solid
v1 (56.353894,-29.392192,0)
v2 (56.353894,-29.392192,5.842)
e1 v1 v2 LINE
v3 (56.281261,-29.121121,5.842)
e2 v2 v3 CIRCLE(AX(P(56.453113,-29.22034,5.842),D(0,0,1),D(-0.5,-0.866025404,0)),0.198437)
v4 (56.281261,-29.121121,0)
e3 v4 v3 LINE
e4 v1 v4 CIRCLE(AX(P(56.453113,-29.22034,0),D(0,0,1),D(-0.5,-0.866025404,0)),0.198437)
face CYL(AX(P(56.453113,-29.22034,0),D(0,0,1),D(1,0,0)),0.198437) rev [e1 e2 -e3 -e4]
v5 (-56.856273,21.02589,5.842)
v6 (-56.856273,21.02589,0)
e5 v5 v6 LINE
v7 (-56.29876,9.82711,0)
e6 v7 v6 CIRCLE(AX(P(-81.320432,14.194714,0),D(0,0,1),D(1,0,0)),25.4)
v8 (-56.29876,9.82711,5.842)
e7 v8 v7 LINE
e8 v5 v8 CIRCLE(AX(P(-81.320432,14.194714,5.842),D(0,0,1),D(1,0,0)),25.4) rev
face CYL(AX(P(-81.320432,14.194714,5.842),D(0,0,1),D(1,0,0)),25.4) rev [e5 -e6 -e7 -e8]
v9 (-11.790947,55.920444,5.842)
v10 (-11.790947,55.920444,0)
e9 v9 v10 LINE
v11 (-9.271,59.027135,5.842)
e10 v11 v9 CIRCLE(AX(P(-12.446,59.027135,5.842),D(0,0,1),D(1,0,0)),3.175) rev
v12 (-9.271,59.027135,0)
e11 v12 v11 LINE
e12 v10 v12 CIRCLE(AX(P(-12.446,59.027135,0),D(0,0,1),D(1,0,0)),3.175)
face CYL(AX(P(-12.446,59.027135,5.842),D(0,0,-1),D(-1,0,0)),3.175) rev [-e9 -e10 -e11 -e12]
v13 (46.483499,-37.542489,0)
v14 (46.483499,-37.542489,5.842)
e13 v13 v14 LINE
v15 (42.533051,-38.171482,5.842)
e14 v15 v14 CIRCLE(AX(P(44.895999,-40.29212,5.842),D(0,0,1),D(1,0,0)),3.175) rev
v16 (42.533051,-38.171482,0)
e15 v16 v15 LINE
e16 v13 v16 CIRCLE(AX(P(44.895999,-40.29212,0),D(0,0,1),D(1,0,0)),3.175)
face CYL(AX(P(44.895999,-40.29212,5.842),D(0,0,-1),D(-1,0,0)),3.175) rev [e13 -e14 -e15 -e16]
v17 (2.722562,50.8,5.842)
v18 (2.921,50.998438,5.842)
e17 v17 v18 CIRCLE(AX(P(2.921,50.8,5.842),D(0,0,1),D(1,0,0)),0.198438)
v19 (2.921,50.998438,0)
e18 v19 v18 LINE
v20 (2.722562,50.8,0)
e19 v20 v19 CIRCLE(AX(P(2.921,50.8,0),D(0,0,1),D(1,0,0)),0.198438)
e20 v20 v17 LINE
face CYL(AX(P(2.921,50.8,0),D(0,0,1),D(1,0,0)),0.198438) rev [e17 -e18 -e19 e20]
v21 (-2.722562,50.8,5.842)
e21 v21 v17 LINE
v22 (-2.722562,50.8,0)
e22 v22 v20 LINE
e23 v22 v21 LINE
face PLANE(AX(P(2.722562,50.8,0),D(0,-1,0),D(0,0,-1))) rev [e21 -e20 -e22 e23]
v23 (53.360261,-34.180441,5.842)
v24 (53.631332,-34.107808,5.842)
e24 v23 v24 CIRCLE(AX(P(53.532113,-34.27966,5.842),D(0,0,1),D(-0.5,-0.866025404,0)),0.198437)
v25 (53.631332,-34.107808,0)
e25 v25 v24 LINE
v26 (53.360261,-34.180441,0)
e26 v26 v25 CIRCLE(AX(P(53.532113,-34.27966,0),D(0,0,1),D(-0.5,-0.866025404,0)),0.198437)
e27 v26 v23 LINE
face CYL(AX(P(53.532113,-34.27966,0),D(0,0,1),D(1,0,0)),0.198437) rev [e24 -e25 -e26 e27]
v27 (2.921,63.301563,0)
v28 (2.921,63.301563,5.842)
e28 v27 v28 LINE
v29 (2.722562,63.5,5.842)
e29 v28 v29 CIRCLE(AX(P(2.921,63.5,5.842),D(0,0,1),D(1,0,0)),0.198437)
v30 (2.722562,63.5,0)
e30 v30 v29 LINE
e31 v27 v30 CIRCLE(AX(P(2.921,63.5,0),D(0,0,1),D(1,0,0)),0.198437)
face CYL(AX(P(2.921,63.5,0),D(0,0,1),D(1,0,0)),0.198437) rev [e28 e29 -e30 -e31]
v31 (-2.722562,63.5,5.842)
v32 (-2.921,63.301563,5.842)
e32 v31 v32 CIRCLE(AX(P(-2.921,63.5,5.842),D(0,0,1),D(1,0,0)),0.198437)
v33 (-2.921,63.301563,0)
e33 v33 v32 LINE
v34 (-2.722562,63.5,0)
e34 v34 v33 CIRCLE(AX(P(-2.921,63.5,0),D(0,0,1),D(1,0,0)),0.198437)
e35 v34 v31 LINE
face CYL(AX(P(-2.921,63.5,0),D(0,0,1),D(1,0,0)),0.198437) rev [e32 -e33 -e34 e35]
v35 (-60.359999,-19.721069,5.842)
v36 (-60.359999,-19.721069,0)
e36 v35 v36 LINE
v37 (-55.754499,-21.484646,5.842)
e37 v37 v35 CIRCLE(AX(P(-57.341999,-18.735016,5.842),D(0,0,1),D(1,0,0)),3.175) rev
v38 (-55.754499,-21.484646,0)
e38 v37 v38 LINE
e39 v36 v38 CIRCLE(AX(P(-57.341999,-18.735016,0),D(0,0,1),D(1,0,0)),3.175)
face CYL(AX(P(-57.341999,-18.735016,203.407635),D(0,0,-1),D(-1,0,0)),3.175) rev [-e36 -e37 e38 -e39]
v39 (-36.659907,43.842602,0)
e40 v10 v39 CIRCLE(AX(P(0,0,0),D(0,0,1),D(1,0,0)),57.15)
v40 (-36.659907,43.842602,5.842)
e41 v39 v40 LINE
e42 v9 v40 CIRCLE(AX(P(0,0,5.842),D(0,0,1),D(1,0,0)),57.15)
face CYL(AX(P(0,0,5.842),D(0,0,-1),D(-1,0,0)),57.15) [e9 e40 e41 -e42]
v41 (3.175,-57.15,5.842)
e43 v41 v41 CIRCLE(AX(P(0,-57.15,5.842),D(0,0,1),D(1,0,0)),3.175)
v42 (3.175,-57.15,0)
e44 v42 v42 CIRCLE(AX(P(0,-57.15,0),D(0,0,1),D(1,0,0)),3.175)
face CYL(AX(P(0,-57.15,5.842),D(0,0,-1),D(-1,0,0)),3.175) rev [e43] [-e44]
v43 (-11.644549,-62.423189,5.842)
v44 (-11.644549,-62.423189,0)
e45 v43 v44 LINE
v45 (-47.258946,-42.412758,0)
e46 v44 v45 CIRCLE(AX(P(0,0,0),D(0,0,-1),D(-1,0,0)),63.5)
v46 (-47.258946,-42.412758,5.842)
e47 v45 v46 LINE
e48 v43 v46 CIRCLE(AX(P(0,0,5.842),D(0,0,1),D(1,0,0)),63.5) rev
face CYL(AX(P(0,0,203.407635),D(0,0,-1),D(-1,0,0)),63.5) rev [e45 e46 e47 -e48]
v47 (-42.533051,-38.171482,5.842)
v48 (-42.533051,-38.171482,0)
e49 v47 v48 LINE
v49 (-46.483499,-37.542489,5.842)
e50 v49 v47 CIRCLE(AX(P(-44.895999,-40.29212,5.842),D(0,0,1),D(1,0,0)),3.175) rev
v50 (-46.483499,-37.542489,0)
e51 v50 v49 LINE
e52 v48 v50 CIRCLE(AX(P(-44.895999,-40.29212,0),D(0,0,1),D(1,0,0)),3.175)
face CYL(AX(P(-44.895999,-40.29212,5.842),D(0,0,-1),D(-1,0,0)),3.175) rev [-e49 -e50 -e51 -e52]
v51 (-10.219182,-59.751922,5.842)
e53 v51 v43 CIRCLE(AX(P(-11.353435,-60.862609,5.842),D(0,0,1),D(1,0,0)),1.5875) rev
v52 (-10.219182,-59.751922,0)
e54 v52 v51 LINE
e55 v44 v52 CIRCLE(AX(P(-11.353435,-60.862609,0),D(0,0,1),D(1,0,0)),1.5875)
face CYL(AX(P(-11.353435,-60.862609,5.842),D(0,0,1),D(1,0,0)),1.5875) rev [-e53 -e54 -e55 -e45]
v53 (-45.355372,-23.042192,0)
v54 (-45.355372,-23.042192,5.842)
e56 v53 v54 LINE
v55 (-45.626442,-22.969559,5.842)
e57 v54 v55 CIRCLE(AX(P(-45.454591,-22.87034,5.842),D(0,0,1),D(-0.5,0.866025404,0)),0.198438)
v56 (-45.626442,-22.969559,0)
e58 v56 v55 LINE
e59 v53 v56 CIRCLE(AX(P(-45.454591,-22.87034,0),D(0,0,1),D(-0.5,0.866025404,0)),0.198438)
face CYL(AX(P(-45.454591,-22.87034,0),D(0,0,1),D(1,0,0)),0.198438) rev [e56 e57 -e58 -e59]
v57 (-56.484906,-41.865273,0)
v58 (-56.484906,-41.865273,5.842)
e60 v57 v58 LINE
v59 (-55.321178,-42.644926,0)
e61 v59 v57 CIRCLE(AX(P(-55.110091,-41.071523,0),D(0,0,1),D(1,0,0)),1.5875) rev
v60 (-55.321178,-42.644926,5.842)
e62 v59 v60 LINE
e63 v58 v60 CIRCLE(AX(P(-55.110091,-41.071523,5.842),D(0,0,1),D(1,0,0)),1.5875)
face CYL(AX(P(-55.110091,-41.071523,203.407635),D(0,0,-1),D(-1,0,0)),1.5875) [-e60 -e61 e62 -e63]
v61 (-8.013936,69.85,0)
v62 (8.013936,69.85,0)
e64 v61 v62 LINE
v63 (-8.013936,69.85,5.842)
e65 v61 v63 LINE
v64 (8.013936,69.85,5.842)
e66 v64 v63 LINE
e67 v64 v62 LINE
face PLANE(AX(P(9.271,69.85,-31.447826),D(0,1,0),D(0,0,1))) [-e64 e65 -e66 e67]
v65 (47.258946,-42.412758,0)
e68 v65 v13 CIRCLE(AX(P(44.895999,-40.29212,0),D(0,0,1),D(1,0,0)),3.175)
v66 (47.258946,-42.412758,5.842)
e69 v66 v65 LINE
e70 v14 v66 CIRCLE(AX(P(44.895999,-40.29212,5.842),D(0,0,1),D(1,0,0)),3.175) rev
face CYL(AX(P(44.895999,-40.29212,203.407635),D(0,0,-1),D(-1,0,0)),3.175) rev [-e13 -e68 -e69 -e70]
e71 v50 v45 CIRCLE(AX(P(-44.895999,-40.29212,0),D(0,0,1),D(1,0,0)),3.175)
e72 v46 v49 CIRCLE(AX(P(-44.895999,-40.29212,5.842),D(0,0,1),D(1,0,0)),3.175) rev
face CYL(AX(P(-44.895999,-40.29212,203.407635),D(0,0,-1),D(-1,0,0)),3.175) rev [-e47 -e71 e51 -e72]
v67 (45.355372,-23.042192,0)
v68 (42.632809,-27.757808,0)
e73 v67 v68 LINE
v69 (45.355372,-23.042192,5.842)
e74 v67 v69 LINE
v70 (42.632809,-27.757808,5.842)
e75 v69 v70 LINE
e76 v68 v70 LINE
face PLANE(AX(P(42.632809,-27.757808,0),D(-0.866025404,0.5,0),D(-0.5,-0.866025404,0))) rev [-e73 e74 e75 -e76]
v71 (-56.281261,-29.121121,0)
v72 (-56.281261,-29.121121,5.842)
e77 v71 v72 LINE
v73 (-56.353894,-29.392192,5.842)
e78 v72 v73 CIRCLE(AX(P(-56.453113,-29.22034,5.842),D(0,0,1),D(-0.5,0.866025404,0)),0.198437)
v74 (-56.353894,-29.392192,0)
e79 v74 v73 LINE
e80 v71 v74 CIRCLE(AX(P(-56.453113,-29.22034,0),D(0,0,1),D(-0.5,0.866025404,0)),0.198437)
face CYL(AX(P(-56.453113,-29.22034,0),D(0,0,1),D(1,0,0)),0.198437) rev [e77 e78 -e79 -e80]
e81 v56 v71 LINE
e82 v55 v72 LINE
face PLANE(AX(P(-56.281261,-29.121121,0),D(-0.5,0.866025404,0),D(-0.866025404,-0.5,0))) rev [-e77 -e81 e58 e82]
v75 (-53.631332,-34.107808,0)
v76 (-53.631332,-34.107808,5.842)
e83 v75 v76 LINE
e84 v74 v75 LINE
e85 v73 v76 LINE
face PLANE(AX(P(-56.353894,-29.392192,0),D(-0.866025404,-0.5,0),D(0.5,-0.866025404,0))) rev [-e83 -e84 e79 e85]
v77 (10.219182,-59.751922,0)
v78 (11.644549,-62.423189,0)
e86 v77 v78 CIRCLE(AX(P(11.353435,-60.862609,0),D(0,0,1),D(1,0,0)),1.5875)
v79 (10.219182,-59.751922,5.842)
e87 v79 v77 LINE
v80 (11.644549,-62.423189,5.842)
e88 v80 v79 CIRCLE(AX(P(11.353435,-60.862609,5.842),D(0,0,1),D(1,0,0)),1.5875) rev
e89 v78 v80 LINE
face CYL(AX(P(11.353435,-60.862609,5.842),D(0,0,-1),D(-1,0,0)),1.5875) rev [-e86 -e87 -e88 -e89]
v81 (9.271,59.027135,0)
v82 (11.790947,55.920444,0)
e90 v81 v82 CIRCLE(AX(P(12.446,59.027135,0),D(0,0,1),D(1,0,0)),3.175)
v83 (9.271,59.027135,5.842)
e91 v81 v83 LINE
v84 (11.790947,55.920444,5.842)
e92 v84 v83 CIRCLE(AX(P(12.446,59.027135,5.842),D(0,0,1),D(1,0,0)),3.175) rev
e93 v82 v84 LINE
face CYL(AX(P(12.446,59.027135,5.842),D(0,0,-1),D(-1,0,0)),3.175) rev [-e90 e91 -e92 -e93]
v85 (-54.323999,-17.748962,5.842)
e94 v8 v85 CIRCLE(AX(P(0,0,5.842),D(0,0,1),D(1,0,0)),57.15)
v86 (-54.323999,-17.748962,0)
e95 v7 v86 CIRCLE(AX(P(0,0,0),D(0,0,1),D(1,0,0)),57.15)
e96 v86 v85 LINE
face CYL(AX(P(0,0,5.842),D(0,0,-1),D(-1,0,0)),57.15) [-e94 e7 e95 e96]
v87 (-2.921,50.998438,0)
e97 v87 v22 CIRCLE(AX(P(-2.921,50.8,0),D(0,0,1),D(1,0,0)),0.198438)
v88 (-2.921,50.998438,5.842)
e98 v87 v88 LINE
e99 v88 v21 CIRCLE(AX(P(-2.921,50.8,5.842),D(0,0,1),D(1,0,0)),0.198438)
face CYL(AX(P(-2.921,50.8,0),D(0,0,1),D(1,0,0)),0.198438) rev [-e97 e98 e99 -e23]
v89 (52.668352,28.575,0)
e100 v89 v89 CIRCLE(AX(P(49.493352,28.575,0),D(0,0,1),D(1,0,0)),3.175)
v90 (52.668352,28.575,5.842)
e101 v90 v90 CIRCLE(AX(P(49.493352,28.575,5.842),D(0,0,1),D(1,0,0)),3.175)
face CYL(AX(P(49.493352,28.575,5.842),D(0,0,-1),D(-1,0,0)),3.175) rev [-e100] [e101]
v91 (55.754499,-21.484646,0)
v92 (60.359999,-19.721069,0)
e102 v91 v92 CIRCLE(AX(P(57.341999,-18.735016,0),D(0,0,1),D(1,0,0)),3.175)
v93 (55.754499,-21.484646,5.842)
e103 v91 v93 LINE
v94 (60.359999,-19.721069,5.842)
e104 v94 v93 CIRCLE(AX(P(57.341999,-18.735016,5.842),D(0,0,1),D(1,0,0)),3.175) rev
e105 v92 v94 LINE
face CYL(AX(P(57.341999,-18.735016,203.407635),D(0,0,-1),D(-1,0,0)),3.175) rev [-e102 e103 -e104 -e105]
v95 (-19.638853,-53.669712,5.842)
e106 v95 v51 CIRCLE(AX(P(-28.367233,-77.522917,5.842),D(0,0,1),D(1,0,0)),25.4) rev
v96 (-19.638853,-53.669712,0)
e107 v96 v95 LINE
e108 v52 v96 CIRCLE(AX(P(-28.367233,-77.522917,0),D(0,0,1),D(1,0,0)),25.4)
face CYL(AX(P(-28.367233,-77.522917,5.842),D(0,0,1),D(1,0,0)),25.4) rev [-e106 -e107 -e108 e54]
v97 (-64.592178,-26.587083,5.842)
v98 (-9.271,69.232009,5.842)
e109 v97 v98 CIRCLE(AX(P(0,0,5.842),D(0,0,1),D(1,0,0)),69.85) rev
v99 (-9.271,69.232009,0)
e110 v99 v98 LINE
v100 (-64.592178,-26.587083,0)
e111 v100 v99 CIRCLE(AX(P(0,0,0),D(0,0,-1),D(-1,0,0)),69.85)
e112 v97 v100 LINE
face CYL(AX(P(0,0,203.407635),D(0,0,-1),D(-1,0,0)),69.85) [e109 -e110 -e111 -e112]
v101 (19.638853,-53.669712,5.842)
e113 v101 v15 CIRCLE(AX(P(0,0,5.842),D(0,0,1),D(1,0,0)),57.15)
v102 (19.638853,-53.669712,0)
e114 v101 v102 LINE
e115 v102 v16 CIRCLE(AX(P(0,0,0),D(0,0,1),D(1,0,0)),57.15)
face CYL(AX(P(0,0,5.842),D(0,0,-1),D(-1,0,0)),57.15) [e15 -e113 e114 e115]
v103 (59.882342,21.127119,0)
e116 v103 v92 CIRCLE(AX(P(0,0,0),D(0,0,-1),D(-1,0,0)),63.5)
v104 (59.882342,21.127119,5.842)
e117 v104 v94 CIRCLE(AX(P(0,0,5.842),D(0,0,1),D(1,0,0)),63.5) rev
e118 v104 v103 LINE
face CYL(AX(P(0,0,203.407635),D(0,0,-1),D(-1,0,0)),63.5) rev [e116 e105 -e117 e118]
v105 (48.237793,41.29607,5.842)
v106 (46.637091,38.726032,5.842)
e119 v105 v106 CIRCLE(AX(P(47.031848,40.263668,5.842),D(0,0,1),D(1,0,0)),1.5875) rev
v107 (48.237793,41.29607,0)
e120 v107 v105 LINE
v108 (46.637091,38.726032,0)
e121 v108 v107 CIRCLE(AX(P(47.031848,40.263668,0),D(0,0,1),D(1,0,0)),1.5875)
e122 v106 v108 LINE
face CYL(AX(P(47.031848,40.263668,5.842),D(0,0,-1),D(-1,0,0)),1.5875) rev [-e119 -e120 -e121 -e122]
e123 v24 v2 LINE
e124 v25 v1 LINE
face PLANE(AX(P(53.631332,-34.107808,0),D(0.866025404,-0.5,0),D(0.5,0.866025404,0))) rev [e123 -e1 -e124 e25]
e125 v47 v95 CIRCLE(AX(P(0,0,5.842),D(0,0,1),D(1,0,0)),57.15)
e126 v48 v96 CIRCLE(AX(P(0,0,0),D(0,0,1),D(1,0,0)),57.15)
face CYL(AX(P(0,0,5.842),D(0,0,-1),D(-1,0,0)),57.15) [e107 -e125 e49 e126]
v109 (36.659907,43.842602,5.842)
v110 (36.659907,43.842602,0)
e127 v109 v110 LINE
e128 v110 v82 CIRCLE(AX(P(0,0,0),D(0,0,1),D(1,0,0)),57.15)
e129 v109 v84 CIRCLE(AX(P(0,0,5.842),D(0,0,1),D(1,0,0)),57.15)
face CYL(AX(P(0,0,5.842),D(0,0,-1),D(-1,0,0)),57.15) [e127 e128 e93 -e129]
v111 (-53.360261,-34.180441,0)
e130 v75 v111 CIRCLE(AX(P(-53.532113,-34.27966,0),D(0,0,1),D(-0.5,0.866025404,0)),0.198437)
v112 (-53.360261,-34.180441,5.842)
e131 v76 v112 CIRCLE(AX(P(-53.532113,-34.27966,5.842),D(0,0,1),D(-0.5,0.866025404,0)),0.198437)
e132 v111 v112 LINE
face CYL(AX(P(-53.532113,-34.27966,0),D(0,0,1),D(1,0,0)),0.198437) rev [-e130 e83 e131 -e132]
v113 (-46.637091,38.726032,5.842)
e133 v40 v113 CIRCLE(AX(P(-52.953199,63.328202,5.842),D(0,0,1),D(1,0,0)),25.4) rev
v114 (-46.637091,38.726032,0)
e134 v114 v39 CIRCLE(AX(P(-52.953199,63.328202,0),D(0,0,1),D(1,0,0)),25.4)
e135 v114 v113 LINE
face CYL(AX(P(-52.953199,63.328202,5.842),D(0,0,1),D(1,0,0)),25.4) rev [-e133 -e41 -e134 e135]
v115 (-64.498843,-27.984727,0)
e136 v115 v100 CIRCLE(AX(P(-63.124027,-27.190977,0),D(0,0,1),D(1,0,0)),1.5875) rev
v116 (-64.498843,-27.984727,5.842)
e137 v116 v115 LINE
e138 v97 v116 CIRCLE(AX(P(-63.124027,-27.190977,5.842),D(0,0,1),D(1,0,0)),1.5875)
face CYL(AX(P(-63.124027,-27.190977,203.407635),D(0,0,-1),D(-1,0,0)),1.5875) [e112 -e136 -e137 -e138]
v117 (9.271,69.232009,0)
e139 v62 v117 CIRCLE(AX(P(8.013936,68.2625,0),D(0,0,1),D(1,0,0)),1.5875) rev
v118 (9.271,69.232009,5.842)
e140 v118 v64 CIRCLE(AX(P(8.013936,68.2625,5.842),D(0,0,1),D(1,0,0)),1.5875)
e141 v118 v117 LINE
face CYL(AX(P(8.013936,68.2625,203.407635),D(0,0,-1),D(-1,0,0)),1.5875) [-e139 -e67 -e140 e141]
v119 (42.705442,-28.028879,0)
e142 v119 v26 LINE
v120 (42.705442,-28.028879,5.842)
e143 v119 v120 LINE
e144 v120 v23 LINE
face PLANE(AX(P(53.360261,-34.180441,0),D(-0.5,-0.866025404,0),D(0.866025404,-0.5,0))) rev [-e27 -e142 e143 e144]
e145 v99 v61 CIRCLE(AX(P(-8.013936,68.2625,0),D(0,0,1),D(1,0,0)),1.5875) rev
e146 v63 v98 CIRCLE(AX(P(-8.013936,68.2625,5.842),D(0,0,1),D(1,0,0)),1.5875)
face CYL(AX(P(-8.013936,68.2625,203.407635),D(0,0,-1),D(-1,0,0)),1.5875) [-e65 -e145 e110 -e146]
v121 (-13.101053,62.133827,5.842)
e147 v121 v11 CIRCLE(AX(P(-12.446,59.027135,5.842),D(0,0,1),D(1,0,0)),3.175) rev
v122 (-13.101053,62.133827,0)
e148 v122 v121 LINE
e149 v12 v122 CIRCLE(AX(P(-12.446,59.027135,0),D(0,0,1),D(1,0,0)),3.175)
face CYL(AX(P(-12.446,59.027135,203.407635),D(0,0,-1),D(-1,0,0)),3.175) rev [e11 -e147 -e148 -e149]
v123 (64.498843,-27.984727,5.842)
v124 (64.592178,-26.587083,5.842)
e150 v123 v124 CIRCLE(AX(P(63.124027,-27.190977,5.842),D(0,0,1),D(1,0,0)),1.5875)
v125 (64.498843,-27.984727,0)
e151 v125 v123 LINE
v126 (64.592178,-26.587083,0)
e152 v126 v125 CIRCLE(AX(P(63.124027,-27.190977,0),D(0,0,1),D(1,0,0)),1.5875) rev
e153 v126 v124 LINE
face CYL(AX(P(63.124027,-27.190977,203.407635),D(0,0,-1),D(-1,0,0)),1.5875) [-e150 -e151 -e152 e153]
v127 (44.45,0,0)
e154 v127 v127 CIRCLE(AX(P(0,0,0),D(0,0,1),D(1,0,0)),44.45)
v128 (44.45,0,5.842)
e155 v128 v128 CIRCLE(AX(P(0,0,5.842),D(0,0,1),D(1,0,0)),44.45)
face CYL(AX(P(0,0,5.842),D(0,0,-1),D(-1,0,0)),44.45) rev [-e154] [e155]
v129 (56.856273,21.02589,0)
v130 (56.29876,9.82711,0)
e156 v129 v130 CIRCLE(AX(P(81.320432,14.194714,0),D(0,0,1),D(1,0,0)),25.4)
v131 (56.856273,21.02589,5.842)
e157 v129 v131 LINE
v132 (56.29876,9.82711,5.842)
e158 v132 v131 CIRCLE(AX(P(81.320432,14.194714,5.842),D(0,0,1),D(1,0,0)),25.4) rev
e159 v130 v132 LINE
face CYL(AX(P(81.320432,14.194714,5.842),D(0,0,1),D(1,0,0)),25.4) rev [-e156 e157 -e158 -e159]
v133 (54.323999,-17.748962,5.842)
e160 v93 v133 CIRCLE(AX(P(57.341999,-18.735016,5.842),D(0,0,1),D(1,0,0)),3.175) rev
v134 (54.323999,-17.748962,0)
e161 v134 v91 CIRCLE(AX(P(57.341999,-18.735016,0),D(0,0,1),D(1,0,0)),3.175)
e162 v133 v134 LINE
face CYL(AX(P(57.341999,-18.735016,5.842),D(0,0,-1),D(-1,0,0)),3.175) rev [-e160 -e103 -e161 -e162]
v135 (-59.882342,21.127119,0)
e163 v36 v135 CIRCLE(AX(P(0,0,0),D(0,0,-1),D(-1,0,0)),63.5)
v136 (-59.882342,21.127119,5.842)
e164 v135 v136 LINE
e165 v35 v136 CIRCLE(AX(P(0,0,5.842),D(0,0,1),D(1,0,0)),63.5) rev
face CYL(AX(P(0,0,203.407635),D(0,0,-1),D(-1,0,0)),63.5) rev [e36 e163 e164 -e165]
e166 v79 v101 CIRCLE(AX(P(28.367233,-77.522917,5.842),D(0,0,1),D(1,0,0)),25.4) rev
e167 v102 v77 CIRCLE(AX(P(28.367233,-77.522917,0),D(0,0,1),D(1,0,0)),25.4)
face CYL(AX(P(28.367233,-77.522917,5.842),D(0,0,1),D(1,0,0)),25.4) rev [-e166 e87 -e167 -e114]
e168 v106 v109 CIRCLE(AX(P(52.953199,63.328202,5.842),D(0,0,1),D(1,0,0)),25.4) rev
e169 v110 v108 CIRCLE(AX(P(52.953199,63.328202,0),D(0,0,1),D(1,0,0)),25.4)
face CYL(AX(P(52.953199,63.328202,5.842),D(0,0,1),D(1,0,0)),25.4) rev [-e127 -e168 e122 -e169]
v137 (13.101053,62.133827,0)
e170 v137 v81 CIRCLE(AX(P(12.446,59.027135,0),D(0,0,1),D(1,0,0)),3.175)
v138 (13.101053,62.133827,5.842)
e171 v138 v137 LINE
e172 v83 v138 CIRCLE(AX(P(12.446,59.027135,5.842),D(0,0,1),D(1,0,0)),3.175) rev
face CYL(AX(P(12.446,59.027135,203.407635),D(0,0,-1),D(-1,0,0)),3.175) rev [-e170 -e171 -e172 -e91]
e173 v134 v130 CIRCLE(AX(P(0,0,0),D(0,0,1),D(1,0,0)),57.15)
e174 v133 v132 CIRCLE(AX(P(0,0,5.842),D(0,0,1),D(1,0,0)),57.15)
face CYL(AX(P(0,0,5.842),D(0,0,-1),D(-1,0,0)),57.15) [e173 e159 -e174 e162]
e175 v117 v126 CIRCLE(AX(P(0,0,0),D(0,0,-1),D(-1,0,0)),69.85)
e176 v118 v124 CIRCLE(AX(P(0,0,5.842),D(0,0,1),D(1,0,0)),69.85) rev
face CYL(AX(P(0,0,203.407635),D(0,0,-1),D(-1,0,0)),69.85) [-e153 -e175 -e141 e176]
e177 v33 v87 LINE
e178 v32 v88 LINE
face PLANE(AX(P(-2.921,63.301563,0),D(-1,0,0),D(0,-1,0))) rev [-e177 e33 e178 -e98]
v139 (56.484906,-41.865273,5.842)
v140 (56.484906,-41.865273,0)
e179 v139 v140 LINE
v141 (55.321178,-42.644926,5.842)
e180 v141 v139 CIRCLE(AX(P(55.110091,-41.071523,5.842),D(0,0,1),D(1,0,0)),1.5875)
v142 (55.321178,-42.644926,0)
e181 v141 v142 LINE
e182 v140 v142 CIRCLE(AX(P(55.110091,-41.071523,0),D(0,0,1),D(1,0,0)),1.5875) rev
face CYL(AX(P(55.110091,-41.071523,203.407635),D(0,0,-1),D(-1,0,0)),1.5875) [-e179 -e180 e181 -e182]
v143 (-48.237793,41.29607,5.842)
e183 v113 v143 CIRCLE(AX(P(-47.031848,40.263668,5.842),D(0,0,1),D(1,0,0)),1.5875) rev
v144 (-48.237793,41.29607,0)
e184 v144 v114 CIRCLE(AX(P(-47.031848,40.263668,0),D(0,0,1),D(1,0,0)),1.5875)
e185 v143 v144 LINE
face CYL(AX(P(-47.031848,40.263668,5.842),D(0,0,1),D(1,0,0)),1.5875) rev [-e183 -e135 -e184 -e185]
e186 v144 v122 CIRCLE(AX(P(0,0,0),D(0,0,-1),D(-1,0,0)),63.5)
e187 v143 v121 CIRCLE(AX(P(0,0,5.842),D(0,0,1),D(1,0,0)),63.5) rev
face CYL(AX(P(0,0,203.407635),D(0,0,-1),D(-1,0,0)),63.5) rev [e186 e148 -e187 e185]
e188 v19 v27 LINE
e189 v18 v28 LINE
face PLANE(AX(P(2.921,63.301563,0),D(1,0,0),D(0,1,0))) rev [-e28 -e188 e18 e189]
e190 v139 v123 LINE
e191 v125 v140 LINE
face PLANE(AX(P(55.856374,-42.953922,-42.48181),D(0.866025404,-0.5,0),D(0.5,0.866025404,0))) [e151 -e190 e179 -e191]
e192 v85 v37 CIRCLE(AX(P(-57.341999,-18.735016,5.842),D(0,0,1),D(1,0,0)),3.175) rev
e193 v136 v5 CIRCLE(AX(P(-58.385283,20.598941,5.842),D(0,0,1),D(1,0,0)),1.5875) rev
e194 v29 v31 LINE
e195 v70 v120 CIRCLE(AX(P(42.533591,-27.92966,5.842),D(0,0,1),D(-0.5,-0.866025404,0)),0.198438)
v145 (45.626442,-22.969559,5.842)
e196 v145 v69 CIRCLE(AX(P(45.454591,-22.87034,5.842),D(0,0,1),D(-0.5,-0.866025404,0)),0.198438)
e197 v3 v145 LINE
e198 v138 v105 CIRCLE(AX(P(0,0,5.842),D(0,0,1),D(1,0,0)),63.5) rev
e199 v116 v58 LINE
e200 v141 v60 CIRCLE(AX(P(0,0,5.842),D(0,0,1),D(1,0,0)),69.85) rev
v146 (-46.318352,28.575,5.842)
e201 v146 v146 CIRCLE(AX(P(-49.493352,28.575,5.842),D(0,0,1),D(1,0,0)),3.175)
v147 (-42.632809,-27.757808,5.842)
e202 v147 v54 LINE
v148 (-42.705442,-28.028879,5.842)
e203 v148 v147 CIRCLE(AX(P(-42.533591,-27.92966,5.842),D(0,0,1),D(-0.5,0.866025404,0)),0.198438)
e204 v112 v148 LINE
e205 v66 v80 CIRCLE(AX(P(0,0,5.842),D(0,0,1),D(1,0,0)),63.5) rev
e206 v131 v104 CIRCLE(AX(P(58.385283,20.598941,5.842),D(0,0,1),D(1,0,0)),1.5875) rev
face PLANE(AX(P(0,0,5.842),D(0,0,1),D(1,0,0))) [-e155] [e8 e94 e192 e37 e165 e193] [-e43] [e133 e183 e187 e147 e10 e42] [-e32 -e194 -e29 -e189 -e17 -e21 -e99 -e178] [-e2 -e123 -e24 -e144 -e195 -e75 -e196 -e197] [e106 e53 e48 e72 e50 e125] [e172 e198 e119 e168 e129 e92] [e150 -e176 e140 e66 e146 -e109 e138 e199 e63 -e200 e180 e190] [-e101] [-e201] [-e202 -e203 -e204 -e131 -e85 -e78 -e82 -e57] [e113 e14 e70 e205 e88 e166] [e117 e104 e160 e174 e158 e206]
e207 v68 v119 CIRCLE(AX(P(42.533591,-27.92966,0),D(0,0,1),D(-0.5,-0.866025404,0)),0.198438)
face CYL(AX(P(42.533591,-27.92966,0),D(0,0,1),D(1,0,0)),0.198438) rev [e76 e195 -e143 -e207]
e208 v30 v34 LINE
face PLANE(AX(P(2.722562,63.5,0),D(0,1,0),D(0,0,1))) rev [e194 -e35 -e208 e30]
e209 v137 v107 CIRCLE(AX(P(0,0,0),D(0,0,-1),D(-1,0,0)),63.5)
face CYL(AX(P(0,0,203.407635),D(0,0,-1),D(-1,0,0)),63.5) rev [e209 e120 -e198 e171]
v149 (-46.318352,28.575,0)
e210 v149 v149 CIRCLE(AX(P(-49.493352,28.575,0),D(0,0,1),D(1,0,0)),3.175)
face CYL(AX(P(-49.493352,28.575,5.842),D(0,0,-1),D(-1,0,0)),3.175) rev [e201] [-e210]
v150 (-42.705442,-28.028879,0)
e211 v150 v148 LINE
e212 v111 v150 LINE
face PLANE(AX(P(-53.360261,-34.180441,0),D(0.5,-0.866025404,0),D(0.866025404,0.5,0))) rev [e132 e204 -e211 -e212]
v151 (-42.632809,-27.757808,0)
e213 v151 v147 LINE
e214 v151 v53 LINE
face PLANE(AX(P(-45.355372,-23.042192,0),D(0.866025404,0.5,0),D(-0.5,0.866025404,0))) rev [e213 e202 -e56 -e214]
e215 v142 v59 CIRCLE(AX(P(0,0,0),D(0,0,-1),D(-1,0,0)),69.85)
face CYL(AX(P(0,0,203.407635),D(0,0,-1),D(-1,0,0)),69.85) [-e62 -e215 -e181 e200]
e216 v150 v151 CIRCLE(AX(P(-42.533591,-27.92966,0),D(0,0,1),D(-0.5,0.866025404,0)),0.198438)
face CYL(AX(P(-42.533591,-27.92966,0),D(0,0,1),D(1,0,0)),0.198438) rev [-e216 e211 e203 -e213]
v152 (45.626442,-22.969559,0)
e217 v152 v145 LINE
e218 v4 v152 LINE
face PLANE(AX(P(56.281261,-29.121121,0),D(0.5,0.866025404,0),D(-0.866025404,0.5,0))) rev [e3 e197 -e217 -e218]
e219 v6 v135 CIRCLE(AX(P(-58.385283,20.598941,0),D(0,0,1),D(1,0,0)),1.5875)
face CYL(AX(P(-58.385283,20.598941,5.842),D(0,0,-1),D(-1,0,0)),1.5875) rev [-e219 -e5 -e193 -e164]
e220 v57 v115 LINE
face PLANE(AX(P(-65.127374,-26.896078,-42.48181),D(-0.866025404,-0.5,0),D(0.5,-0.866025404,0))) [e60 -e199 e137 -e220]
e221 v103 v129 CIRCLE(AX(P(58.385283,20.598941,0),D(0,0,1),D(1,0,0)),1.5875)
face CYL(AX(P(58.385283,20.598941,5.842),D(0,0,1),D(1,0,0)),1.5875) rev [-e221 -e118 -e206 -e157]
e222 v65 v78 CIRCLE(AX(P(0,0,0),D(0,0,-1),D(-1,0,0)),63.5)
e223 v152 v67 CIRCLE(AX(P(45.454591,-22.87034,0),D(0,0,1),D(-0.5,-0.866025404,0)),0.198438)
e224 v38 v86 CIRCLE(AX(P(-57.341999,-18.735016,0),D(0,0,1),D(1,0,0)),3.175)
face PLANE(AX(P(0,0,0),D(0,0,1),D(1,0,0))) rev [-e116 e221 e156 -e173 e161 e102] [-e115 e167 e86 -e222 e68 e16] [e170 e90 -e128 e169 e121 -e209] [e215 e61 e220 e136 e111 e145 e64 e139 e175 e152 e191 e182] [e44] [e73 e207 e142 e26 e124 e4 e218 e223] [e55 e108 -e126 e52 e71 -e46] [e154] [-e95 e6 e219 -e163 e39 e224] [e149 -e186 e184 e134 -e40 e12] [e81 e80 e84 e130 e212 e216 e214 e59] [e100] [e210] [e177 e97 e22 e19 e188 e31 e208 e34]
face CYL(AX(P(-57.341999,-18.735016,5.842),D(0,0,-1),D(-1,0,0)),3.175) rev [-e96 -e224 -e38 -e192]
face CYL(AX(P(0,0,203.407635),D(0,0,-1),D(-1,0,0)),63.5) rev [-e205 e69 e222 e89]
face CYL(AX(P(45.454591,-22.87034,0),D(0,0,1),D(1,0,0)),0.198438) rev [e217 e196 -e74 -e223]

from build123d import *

# Parameters (mm, degrees)
SKETCH1_R           = 44.45
SKETCH1_R_2         = 3.175
BOSS_EXTRUDE1_DEPTH = 5.842
FILLET5_R           = 25.4
SKETCH3_R           = 69.85
SKETCH3_R_2         = 63.5
BOSS_EXTRUDE3_DEPTH = 5.842
FILLET7_R           = 1.5875
SKETCH5_W           = 18.542
SKETCH5_H           = 25.4
BOSS_EXTRUDE4_DEPTH = 5.842
CIRPATTERN1_COUNT   = 3
FILLET8_R           = 1.5875
CUT_EXTRUDE7_DEPTH  = 99.955414168
CIRPATTERN2_COUNT   = 3
FILLET9_R           = 3.175


with BuildPart() as part:
    # Sketch1 → Boss-Extrude1 (new body)
    with BuildSketch(Plane.XY):
        with BuildLine():
            ThreePointArc((-53.551878894, 19.957924914), (-49.493351826, -28.575), (-9.491869465, -56.35625))
            ThreePointArc((-9.491869465, -56.35625), (0, -66.675), (9.491869465, -56.35625))
            ThreePointArc((9.491869465, -56.35625), (49.493351826, -28.575), (53.551878894, 19.957924914))
            ThreePointArc((53.551878894, 19.957924914), (57.742243797, 33.3375), (44.06000943, 36.398325086))
            ThreePointArc((44.06000943, 36.398325086), (0, 57.15), (-44.06000943, 36.398325086))
            ThreePointArc((-44.06000943, 36.398325086), (-57.742243797, 33.3375), (-53.551878894, 19.957924914))
        make_face()
        Circle(SKETCH1_R, mode=Mode.SUBTRACT)
        with Locations((49.493351826, 28.575)):
            Circle(SKETCH1_R_2, mode=Mode.SUBTRACT)
        with Locations((0, -57.15)):
            Circle(SKETCH1_R_2, mode=Mode.SUBTRACT)
        with Locations((-49.493351826, 28.575)):
            Circle(SKETCH1_R_2, mode=Mode.SUBTRACT)
    extrude(amount=BOSS_EXTRUDE1_DEPTH)

    # Fillet5
    fillet5_edges = [part.edges().sort_by_distance(p)[0] for p in [
        (44.06000943, 36.398325086, 2.921),
        (53.551878894, 19.957924914, 2.921),
        (9.491869465, -56.35625, 2.921),
        (-9.491869465, -56.35625, 2.921),
        (-53.551878894, 19.957924914, 2.921),
        (-44.06000943, 36.398325086, 2.921),
    ]]
    fillet(fillet5_edges, radius=FILLET5_R)

    # Sketch3 → Boss-Extrude3 (add)
    with BuildSketch(Plane(origin=(0, 0, 0), x_dir=(-1, 0, 0), z_dir=(0, 0, -1))):
        Circle(SKETCH3_R)
        Circle(SKETCH3_R_2, mode=Mode.SUBTRACT)
    extrude(amount=-BOSS_EXTRUDE3_DEPTH)

    # Fillet7
    fillet7_edges = [part.edges().sort_by_distance(p)[0] for p in [
        (58.345991594, 25.059833697, 2.921),
        (50.875448393, 37.999194081, 2.921),
        (-7.470543201, -63.059027778, 2.921),
        (7.470543201, -63.059027778, 2.921),
        (-50.875448393, 37.999194081, 2.921),
        (-58.345991594, 25.059833697, 2.921),
    ]]
    fillet(fillet7_edges, radius=FILLET7_R)

    # Sketch5 → Boss-Extrude4 (add)
    with BuildSketch(Plane.XY.offset(5.842)):
        with Locations((0, 57.15)):
            Rectangle(SKETCH5_W, SKETCH5_H)
    boss_extrude4 = extrude(amount=-BOSS_EXTRUDE4_DEPTH)

    # CirPattern1: Boss-Extrude4 ×3 about axis
    cirpattern1_axis = Axis((0, 0, 0), (0, 0, 1))
    for i in range(1, CIRPATTERN1_COUNT):
        add(boss_extrude4.rotate(cirpattern1_axis, i * 360 / CIRPATTERN1_COUNT))

    # Fillet8
    # the kernel refuses this fillet: 1.5875 mm, written as the material it takes off along each edge
    with BuildSketch(Plane(origin=(65.127374454, -26.896078482, 8.984658812), x_dir=(-0.8660254037844379, 0.500000000000001, 0), z_dir=(0, 0, -1)), Plane(origin=(-9.271, 69.85, 8.984658812), x_dir=(0, -1, 0), z_dir=(0, 0, -1))) as fillet8_piece_1:
        with BuildLine():
            CenterArc((1.5875, -1.257063525), FILLET8_R, 127.641167987, 52.358832013)
            Line((0, -1.257063525), (-0.03175, -1.257063525))
            Line((-0.03175, -1.257063525), (-0.03175, 0))
            Line((-0.03175, 0), (0, 0.03175))
            ThreePointArc((0, 0.03175), (0.30899554, 0.03175), (0.598600902, 0.02514127))
            Line((0.598600902, 0.02514127), (0.617991081, 0))
        make_face()
    extrude(amount=12.127317624, mode=Mode.SUBTRACT)
    with BuildSketch(Plane(origin=(55.856374454, -42.953921518, 8.984658812), x_dir=(0.5000000000000007, 0.8660254037844382, 0), z_dir=(0, 0, -1)), Plane(origin=(-65.127374454, -26.896078482, 8.984658812), x_dir=(0.5000000000000024, -0.8660254037844373, 0), z_dir=(0, 0, -1)), Plane(origin=(9.271, 69.85, 8.984658812), x_dir=(-1, 0, 0), z_dir=(0, 0, -1))) as fillet8_piece_2:
        with BuildLine():
            CenterArc((1.257063525, -1.5875), FILLET8_R, 90, 52.358832013)
            Line((0, -0.617991081), (-0.02514127, -0.598600902))
            ThreePointArc((-0.02514127, -0.598600902), (-0.03175, -0.30899554), (-0.03175, 0))
            Line((-0.03175, 0), (0, 0.03175))
            Line((0, 0.03175), (1.257063525, 0.03175))
            Line((1.257063525, 0.03175), (1.257063525, 0))
        make_face()
    extrude(amount=12.127317624, mode=Mode.SUBTRACT)
    with BuildSketch(Plane(origin=(-55.856374454, -42.953921518, 8.984658812), x_dir=(-0.5, 0.8660254037844386, 0), z_dir=(0, 0, -1))) as fillet8_piece_3:
        with BuildLine():
            CenterArc((1.257063525, 1.5875), FILLET8_R, 217.641167987, 52.358832013)
            Line((0, 0.617991081), (-0.02514127, 0.598600902))
            ThreePointArc((-0.02514127, 0.598600902), (-0.03175, 0.30899554), (-0.03175, 0))
            Line((-0.03175, 0), (0, -0.03175))
            Line((0, -0.03175), (1.257063525, -0.03175))
            Line((1.257063525, -0.03175), (1.257063525, 0))
        make_face()
    extrude(amount=12.127317624, mode=Mode.SUBTRACT)

    # Sketch7 → Cut-Extrude7 (cut, through all)
    with BuildSketch(Plane.XY.offset(5.842)):
        with BuildLine():
            Line((2.7225625, 63.5), (-2.7225625, 63.5))
            ThreePointArc((-2.7225625, 63.5), (-3.061316502, 63.640316502), (-2.921, 63.3015625))
            Line((-2.921, 63.3015625), (-2.921, 50.9984375))
            ThreePointArc((-2.921, 50.9984375), (-3.061316502, 50.659683498), (-2.7225625, 50.8))
            Line((-2.7225625, 50.8), (2.7225625, 50.8))
            ThreePointArc((2.7225625, 50.8), (3.061316502, 50.659683498), (2.921, 50.9984375))
            Line((2.921, 50.9984375), (2.921, 63.3015625))
            ThreePointArc((2.921, 63.3015625), (3.061316502, 63.640316502), (2.7225625, 63.5))
        make_face()
    cut_extrude7 = extrude(amount=-CUT_EXTRUDE7_DEPTH, mode=Mode.SUBTRACT)

    # CirPattern2: Cut-Extrude7 ×3 about axis
    cirpattern2_axis = Axis((0, 0, 0), (0, 0, 1))
    for i in range(1, CIRPATTERN2_COUNT):
        add(cut_extrude7.rotate(cirpattern2_axis, i * 360 / CIRPATTERN2_COUNT), mode=Mode.SUBTRACT)

    # Fillet9
    # the kernel refuses this fillet: 3.175 mm, written as the material it adds along each edge
    with BuildSketch(Plane(origin=(9.271, 56.393005408, 5.842), x_dir=(0.9828671529049069, -0.18431538118291227, 0), z_dir=(0, 0, -1)), Plane(origin=(44.202275279, -36.225424223, 5.842), x_dir=(-0.6510553788650718, -0.7590302323694741, 0), z_dir=(0, 0, -1)), Plane(origin=(-53.473275279, -20.167581186, 5.842), x_dir=(-0.33181177403983686, 0.9433456135523905, 0), z_dir=(0, 0, -1))) as fillet9_piece_1:
        with BuildLine():
            CenterArc((2.635092544, -3.174201143), FILLET9_R, 91.285314708, 78.093465038)
            Line((-0.485510666, -2.588999807), (0, 0))
            ThreePointArc((0, 0), (1.281936913, -0.014379431), (2.563873827, 0))
        make_face()
    extrude(amount=5.842)
    with BuildSketch(Plane(origin=(9.271, 62.819571465, 5.842), x_dir=(0, -1, 0), z_dir=(0, 0, -1)), Plane(origin=(49.767844743, -39.438707251, 5.842), x_dir=(-0.8660254037844377, 0.5000000000000018, 0), z_dir=(0, 0, -1)), Plane(origin=(-59.038844743, -23.380864214, 5.842), x_dir=(0.8660254037844375, 0.500000000000002, 0), z_dir=(0, 0, -1))) as fillet9_piece_2:
        with BuildLine():
            CenterArc((3.792436103, -3.175), FILLET9_R, 90, 101.906534962)
            ThreePointArc((0.685744768, -3.830052632), (0.313529726, -1.920279918), (0, 0))
            Line((0, 0), (3.792436103, 0))
        make_face()
    extrude(amount=5.842)
    with BuildSketch(Plane(origin=(-9.271, 56.393005408, 5.842), x_dir=(-0.9828671529049081, -0.18431538118290586, 0), z_dir=(0, 0, -1))) as fillet9_piece_3:
        with BuildLine():
            CenterArc((2.635092544, 3.174201143), FILLET9_R, 190.621220255, 78.093465038)
            Line((-0.485510666, 2.588999807), (0, 0))
            ThreePointArc((0, 0), (1.281936913, 0.014379431), (2.563873827, 0))
        make_face()
    extrude(amount=5.842)
    with BuildSketch(Plane(origin=(-9.271, 62.819571465, 5.842), x_dir=(-0.9843471139890508, -0.17624062863433815, 0), z_dir=(0, 0, -1)), Plane(origin=(59.038844743, -23.380864214, 5.842), x_dir=(0.339544695418249, 0.9405899211735838, 0), z_dir=(0, 0, -1)), Plane(origin=(-49.767844743, -39.438707251, 5.842), x_dir=(0.6448024185707977, -0.7643492925392487, 0), z_dir=(0, 0, -1))) as fillet9_piece_4:
        with BuildLine():
            CenterArc((3.79368341, -3.173509537), FILLET9_R, 88.244328147, 101.906534962)
            Line((0.668381323, -3.733073533), (0, 0))
            ThreePointArc((0, 0), (1.945478672, 0.029809259), (3.890957343, 0))
        make_face()
    extrude(amount=5.842)
    with BuildSketch(Plane(origin=(53.473275279, -20.167581186, 5.842), x_dir=(0.8660254037844376, -0.5000000000000019, 0), z_dir=(0, 0, -1)), Plane(origin=(-44.202275279, -36.225424223, 5.842), x_dir=(-0.866025403784439, -0.49999999999999933, 0), z_dir=(0, 0, -1))) as fillet9_piece_5:
        with BuildLine():
            CenterArc((2.634129953, -3.175), FILLET9_R, 90, 78.093465038)
            ThreePointArc((-0.472561382, -2.519947368), (-0.22214762, -1.262624035), (0, 0))
            Line((0, 0), (2.634129953, 0))
        make_face()
    extrude(amount=5.842)


solid = part.part
